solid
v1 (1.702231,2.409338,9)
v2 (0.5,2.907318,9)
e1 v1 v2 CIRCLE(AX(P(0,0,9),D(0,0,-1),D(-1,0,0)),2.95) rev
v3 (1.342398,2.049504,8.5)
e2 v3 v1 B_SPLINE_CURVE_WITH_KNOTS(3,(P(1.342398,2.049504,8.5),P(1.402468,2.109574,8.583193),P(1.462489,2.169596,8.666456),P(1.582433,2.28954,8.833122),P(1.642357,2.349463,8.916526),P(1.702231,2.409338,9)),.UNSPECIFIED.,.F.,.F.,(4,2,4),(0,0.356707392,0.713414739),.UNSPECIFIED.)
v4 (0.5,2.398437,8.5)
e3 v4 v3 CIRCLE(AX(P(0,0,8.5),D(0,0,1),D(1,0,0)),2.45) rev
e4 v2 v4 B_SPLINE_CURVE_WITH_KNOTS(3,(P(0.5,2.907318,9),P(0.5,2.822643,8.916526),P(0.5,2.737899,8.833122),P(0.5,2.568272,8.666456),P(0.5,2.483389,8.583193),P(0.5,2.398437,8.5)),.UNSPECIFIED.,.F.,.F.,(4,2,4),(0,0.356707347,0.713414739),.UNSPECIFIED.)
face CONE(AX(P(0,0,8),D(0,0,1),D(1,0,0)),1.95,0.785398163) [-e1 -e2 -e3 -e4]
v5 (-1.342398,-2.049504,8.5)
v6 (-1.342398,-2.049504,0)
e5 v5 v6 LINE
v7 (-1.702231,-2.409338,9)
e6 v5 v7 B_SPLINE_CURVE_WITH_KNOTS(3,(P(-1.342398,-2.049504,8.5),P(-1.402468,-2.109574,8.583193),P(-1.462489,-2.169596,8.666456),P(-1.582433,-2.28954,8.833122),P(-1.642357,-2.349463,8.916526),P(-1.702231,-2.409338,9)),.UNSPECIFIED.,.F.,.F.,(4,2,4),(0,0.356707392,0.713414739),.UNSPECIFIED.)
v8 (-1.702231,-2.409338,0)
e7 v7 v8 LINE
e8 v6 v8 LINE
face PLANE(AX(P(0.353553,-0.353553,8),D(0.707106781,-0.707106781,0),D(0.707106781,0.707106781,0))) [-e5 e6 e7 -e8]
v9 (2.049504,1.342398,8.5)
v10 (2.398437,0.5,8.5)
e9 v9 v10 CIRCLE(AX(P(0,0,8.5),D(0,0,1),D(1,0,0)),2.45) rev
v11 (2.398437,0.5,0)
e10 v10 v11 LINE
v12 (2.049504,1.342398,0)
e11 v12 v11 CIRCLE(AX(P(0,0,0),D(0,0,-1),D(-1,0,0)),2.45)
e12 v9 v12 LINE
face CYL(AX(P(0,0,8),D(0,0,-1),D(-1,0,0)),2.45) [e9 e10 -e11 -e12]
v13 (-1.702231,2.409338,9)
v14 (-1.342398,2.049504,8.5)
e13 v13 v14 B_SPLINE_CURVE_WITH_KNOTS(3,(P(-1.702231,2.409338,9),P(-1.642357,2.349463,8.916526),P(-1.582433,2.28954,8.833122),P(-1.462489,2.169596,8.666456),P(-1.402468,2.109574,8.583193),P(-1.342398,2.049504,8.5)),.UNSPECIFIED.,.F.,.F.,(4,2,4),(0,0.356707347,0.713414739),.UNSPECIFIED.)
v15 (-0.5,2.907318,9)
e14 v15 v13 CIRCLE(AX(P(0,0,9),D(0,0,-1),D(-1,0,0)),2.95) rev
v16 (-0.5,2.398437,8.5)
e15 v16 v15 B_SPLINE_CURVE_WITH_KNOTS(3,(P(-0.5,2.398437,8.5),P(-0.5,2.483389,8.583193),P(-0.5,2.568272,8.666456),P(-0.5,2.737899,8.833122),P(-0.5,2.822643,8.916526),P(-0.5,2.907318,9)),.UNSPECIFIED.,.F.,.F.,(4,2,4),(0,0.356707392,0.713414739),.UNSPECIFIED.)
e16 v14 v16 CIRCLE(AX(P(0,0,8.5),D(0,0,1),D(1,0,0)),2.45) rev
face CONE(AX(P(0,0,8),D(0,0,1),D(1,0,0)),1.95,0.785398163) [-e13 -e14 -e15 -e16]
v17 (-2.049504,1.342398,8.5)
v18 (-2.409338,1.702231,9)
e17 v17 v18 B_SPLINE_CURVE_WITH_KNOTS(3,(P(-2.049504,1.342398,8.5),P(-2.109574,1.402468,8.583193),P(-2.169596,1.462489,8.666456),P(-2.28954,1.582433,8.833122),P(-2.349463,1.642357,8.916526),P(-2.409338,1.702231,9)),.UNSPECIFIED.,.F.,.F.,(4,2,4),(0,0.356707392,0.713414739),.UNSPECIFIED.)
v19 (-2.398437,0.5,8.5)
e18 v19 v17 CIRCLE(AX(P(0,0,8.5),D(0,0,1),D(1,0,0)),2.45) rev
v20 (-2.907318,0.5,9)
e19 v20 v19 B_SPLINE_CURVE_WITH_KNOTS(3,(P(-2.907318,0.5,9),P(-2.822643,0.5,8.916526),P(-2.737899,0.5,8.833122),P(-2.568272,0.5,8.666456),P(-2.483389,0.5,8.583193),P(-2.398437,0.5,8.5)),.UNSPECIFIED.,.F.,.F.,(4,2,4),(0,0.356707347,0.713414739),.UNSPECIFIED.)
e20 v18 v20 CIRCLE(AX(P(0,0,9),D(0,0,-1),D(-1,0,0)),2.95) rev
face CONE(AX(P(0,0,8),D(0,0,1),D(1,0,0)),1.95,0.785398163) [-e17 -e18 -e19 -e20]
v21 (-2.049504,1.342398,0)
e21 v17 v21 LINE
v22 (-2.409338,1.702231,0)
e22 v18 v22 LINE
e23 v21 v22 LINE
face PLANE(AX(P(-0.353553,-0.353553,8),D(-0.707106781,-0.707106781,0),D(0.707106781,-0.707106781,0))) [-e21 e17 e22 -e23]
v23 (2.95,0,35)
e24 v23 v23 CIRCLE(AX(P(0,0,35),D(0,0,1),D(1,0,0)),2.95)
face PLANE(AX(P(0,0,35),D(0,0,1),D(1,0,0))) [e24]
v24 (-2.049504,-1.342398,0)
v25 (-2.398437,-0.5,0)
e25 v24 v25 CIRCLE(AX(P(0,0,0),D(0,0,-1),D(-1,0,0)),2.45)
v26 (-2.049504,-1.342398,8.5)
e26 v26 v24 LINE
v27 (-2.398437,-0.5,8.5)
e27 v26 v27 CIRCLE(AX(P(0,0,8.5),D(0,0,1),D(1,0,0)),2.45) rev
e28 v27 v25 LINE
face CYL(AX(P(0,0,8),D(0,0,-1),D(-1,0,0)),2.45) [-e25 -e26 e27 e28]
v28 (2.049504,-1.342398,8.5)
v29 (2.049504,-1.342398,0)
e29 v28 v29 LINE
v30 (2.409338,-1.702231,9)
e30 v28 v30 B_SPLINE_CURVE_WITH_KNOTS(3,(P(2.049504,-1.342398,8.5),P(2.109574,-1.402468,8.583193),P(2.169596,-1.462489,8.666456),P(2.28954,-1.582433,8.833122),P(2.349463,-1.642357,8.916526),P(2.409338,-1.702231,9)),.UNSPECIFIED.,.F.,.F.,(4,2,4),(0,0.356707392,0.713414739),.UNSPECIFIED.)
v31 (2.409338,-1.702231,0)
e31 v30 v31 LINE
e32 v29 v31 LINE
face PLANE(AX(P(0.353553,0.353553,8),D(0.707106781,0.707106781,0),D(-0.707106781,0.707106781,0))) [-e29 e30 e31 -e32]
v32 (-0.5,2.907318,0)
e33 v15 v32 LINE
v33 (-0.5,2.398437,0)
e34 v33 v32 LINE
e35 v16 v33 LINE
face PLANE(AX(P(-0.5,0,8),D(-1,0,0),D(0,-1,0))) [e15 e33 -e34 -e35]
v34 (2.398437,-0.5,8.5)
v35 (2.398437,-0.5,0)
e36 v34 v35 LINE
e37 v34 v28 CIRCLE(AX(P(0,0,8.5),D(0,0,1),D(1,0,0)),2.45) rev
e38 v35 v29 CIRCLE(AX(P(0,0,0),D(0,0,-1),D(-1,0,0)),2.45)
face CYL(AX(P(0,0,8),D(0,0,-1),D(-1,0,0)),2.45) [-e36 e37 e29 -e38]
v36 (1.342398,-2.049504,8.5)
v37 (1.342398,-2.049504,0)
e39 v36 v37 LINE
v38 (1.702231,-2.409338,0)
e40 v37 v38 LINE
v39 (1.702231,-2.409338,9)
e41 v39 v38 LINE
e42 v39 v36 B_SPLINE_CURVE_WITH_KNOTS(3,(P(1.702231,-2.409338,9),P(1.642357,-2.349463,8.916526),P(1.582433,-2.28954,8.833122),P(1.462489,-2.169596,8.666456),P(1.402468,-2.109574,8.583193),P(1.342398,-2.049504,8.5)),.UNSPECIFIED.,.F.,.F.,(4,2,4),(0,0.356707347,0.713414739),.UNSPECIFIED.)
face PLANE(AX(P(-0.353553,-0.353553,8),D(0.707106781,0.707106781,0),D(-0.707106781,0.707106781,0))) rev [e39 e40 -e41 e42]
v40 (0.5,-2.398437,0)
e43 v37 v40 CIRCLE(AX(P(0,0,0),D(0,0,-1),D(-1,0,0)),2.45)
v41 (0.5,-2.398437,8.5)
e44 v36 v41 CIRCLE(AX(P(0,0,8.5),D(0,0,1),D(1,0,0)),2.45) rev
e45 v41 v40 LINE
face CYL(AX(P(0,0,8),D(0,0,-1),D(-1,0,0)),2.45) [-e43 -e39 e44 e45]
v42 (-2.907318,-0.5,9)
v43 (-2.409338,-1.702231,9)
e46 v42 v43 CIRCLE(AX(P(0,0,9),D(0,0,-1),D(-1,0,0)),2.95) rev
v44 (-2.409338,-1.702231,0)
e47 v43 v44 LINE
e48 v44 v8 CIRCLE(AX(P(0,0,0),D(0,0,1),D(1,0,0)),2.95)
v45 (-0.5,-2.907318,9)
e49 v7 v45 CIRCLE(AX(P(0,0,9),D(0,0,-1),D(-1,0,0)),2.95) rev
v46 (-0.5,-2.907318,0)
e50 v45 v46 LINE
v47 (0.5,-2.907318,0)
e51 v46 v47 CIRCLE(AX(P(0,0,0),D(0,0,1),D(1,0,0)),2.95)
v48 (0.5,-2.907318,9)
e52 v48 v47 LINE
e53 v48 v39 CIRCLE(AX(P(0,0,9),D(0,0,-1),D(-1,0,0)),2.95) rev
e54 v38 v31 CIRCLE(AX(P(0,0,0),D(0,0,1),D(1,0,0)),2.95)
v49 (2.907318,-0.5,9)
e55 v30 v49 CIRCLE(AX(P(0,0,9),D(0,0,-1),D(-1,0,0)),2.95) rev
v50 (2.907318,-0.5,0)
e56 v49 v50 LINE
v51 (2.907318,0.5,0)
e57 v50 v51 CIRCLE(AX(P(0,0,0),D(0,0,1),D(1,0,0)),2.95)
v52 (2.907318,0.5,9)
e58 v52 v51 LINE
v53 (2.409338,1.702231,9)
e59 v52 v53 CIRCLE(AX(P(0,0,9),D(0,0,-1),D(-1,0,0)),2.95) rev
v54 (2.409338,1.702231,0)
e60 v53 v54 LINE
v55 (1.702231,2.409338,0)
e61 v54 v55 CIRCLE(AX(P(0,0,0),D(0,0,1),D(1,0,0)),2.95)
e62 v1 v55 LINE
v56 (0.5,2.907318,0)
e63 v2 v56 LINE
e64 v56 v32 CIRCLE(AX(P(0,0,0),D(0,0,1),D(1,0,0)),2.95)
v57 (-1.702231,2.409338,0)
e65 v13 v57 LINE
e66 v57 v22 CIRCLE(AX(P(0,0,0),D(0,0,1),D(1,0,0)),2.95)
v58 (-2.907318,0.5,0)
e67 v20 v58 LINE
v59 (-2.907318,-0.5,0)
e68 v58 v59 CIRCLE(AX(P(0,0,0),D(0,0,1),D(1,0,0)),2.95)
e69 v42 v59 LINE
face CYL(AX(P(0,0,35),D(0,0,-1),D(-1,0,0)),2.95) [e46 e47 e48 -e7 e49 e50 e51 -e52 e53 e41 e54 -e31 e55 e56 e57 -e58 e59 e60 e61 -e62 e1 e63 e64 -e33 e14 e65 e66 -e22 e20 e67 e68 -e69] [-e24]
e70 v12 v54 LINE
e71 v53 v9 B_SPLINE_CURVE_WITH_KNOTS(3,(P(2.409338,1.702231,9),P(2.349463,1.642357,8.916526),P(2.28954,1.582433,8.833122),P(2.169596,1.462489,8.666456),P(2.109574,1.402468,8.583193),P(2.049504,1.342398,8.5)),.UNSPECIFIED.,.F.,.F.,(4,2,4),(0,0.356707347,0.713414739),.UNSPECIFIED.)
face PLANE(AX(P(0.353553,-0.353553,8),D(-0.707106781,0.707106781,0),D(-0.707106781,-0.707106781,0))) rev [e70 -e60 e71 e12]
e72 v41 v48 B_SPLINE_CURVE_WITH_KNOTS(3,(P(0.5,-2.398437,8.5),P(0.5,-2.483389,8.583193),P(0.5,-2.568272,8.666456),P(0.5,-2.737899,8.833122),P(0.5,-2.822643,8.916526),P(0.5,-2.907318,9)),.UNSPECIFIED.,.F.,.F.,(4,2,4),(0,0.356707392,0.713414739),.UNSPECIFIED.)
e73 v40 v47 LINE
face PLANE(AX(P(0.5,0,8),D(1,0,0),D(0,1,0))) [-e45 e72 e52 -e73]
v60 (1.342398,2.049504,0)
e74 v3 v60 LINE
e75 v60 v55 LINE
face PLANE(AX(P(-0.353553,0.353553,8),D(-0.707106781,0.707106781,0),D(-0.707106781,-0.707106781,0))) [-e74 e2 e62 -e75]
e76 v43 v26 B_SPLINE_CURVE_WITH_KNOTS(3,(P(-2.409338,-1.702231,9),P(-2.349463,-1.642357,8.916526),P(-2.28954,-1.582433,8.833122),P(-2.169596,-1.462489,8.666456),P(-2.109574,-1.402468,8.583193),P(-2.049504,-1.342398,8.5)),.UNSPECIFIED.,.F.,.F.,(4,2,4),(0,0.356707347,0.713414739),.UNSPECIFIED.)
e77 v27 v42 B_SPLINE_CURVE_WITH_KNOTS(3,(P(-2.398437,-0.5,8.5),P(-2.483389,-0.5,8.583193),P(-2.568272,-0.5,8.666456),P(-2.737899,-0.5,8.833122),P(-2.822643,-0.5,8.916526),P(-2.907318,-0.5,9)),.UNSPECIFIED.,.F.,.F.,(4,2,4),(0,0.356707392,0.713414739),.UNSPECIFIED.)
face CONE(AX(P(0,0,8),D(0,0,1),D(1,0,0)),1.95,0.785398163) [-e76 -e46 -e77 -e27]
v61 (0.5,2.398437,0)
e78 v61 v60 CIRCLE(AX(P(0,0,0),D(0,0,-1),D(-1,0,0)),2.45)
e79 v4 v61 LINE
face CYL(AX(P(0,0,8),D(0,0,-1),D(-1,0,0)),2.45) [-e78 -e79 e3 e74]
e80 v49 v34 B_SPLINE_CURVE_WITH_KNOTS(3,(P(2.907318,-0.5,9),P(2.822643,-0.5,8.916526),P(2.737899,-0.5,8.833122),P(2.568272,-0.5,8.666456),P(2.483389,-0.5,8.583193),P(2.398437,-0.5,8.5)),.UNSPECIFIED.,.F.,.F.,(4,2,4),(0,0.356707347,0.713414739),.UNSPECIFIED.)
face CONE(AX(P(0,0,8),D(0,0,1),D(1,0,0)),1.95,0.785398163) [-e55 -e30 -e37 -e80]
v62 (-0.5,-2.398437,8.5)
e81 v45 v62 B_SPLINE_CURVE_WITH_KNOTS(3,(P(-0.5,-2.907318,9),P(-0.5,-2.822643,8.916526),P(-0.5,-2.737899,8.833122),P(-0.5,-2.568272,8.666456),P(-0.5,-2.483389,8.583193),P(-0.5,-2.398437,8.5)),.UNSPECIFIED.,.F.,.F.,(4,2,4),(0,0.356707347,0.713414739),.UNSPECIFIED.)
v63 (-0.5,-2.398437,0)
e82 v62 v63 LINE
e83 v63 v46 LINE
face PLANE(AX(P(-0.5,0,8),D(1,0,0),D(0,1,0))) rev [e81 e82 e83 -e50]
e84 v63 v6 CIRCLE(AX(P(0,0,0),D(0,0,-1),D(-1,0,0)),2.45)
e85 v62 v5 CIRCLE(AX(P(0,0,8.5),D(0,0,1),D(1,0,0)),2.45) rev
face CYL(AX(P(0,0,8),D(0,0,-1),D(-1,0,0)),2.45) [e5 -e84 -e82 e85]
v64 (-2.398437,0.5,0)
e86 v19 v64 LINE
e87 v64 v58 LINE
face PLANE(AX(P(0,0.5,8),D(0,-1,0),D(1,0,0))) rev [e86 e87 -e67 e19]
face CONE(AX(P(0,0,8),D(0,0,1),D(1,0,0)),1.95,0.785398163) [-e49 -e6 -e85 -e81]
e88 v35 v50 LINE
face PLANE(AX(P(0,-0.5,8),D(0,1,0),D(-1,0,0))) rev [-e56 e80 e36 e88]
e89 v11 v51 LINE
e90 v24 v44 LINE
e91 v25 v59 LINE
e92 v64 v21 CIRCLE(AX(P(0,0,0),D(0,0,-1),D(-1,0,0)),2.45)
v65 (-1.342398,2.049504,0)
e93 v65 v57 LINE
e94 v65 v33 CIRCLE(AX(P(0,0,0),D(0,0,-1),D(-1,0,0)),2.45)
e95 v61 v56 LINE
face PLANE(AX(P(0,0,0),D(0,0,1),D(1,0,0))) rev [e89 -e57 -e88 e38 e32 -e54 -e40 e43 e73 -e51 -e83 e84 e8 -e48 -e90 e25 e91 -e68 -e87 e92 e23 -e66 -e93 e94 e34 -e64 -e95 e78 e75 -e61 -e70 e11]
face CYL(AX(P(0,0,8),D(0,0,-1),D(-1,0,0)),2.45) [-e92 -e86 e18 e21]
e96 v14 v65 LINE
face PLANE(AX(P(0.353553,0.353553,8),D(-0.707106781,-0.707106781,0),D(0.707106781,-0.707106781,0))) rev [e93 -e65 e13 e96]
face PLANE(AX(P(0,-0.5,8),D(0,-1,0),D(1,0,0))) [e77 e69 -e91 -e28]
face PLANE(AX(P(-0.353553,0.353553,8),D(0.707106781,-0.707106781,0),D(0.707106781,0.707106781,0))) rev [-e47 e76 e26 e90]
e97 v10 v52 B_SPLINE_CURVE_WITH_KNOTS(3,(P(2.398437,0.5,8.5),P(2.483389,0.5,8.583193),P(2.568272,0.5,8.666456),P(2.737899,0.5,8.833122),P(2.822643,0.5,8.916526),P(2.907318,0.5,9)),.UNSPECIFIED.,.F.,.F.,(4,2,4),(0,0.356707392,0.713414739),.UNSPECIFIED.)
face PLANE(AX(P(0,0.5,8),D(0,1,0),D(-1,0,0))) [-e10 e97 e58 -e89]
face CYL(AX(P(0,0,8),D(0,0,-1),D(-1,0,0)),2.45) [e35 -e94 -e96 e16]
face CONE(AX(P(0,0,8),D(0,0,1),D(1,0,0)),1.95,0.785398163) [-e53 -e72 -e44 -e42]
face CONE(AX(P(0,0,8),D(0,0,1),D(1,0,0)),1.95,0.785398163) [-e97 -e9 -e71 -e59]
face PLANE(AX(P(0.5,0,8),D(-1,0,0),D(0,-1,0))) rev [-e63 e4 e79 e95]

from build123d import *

# Parameters (mm, degrees)
SKETCH1_R           = 2.95
BOSS_EXTRUDE1_DEPTH = 35
CUT_EXTRUDE1_DEPTH  = 8
CHAMFER1_SIZE       = 1


with BuildPart() as part:
    # Sketch1 → Boss-Extrude1 (new body)
    with BuildSketch(Plane.XY):
        Circle(SKETCH1_R)
    extrude(amount=BOSS_EXTRUDE1_DEPTH)

    # Sketch2 → Cut-Extrude1 (cut)
    with BuildSketch(Plane(origin=(0, 0, 0), x_dir=(-1, 0, 0), z_dir=(0, 0, -1))):
        with BuildLine():
            ThreePointArc((-2.398436991, 0.5), (-2.263504855, 0.937574409), (-2.049504451, 1.34239767))
            Line((-2.049504451, 1.34239767), (-2.409337912, 1.702231131))
            ThreePointArc((-2.409337912, 1.702231131), (-2.725444621, 1.128916125), (-2.907318352, 0.5))
            Line((-2.907318352, 0.5), (-2.398436991, 0.5))
        make_face()
        with BuildLine():
            ThreePointArc((-1.34239767, 2.049504451), (-0.937574409, 2.263504855), (-0.5, 2.398436991))
            Line((-0.5, 2.398436991), (-0.5, 2.907318352))
            ThreePointArc((-0.5, 2.907318352), (-1.128916125, 2.725444621), (-1.702231131, 2.409337912))
            Line((-1.702231131, 2.409337912), (-1.34239767, 2.049504451))
        make_face()
        with BuildLine():
            Line((0.5, 2.907318352), (0.5, 2.398436991))
            ThreePointArc((0.5, 2.398436991), (0.937574409, 2.263504855), (1.34239767, 2.049504451))
            Line((1.34239767, 2.049504451), (1.702231131, 2.409337912))
            ThreePointArc((1.702231131, 2.409337912), (1.128916125, 2.725444621), (0.5, 2.907318352))
        make_face()
        with BuildLine():
            Line((2.409337912, 1.702231131), (2.049504451, 1.34239767))
            ThreePointArc((2.049504451, 1.34239767), (2.263504855, 0.937574409), (2.398436991, 0.5))
            Line((2.398436991, 0.5), (2.907318352, 0.5))
            ThreePointArc((2.907318352, 0.5), (2.725444621, 1.128916125), (2.409337912, 1.702231131))
        make_face()
        with BuildLine():
            Line((2.907318352, -0.5), (2.398436991, -0.5))
            ThreePointArc((2.398436991, -0.5), (2.263504855, -0.937574409), (2.049504451, -1.34239767))
            Line((2.049504451, -1.34239767), (2.409337912, -1.702231131))
            ThreePointArc((2.409337912, -1.702231131), (2.725444621, -1.128916125), (2.907318352, -0.5))
        make_face()
        with BuildLine():
            Line((1.702231131, -2.409337912), (1.34239767, -2.049504451))
            ThreePointArc((1.34239767, -2.049504451), (0.937574409, -2.263504855), (0.5, -2.398436991))
            Line((0.5, -2.398436991), (0.5, -2.907318352))
            ThreePointArc((0.5, -2.907318352), (1.128916125, -2.725444621), (1.702231131, -2.409337912))
        make_face()
        with BuildLine():
            ThreePointArc((-0.5, -2.398436991), (-0.937574409, -2.263504855), (-1.34239767, -2.049504451))
            Line((-1.34239767, -2.049504451), (-1.702231131, -2.409337912))
            ThreePointArc((-1.702231131, -2.409337912), (-1.128916125, -2.725444621), (-0.5, -2.907318352))
            Line((-0.5, -2.907318352), (-0.5, -2.398436991))
        make_face()
        with BuildLine():
            ThreePointArc((-2.049504451, -1.34239767), (-2.263504855, -0.937574409), (-2.398436991, -0.5))
            Line((-2.398436991, -0.5), (-2.907318352, -0.5))
            ThreePointArc((-2.907318352, -0.5), (-2.725444621, -1.128916125), (-2.409337912, -1.702231131))
            Line((-2.409337912, -1.702231131), (-2.049504451, -1.34239767))
        make_face()
    extrude(amount=-CUT_EXTRUDE1_DEPTH, mode=Mode.SUBTRACT)

    # Chamfer1
    # the kernel refuses this chamfer: 1 mm, written as the material it takes off along each edge
    with BuildSketch(Plane(origin=(0, 0, 8), x_dir=(0.6453423073627431, -0.7638935176631171, 0), z_dir=(0.7638935176631171, 0.6453423073627431, 0))) as chamfer1_piece_1_section:
        Polygon((2.95, -CHAMFER1_SIZE), (2.95 - CHAMFER1_SIZE, 0), (2.95, 0), align=None)
    chamfer1_piece_1 = revolve(axis=Axis((0, 0, 8), (0, 0, -1)), revolution_arc=125.382690704, mode=Mode.PRIVATE)
    chamfer1_piece_1 = split(chamfer1_piece_1, bisect_by=Plane(origin=(0.5, 0, 8), z_dir=(1, 0, 0)), keep=Keep.TOP, mode=Mode.PRIVATE)
    chamfer1_piece_1 = split(chamfer1_piece_1, bisect_by=Plane(origin=(-0.353553391, -0.353553391, 8), z_dir=(-0.7071067811865415, -0.7071067811865537, 0)), keep=Keep.TOP, mode=Mode.PRIVATE)
    chamfer1_piece_1 = chamfer1_piece_1 - Plane(origin=(0, 0, 8), x_dir=(0.20408163265306725, -0.9789538738948115, 0), z_dir=(0, 0, -1)) * Cylinder(2.45, 12, mode=Mode.PRIVATE)
    add(chamfer1_piece_1, mode=Mode.SUBTRACT)
    with BuildSketch(Plane(origin=(0, 0, 8), x_dir=(0.6453423073627431, -0.7638935176631171, 0), z_dir=(0.7638935176631171, 0.6453423073627431, 0))) as chamfer1_piece_2_section:
        Polygon((2.95, -CHAMFER1_SIZE), (2.95 - CHAMFER1_SIZE, 0), (2.95, 0), align=None)
    chamfer1_piece_2 = revolve(axis=Axis((0, 0, 8), (0, 0, -1)), revolution_arc=125.382690704, mode=Mode.PRIVATE)
    chamfer1_piece_2 = split(chamfer1_piece_2, bisect_by=Plane(origin=(0.353553391, -0.353553391, 8), z_dir=(0.7071067811865517, -0.7071067811865434, 0)), keep=Keep.TOP, mode=Mode.PRIVATE)
    chamfer1_piece_2 = split(chamfer1_piece_2, bisect_by=Plane(origin=(-0.5, 0, 8), z_dir=(-1, 0, 0)), keep=Keep.TOP, mode=Mode.PRIVATE)
    chamfer1_piece_2 = chamfer1_piece_2 - Plane(origin=(0, 0, 8), x_dir=(0.20408163265306725, -0.9789538738948115, 0), z_dir=(0, 0, -1)) * Cylinder(2.45, 12, mode=Mode.PRIVATE)
    add(chamfer1_piece_2, mode=Mode.SUBTRACT)
    with BuildSketch(Plane(origin=(0, 0, 8), x_dir=(0.6453423073627431, -0.7638935176631171, 0), z_dir=(0.7638935176631171, 0.6453423073627431, 0))) as chamfer1_piece_3_section:
        Polygon((2.95, -CHAMFER1_SIZE), (2.95 - CHAMFER1_SIZE, 0), (2.95, 0), align=None)
    chamfer1_piece_3 = revolve(axis=Axis((0, 0, 8), (0, 0, -1)), revolution_arc=125.382690704, mode=Mode.PRIVATE)
    chamfer1_piece_3 = split(chamfer1_piece_3, bisect_by=Plane(origin=(0, -0.5, 8), z_dir=(0, -1, 0)), keep=Keep.TOP, mode=Mode.PRIVATE)
    chamfer1_piece_3 = split(chamfer1_piece_3, bisect_by=Plane(origin=(-0.353553391, 0.353553391, 8), z_dir=(-0.7071067811865515, 0.7071067811865437, 0)), keep=Keep.TOP, mode=Mode.PRIVATE)
    chamfer1_piece_3 = chamfer1_piece_3 - Plane(origin=(0, 0, 8), x_dir=(0.20408163265306725, -0.9789538738948115, 0), z_dir=(0, 0, -1)) * Cylinder(2.45, 12, mode=Mode.PRIVATE)
    add(chamfer1_piece_3, mode=Mode.SUBTRACT)
    with BuildSketch(Plane(origin=(0, 0, 8), x_dir=(-0.083828364721268, -0.9964802081668046, 0), z_dir=(0.9964802081668046, -0.083828364721268, 0))) as chamfer1_piece_4_section:
        Polygon((2.95, -CHAMFER1_SIZE), (2.95 - CHAMFER1_SIZE, 0), (2.95, 0), align=None)
    chamfer1_piece_4 = revolve(axis=Axis((0, 0, 8), (0, 0, -1)), revolution_arc=125.382690704, mode=Mode.PRIVATE)
    chamfer1_piece_4 = split(chamfer1_piece_4, bisect_by=Plane(origin=(0.353553391, -0.353553391, 8), z_dir=(0.7071067811865517, -0.7071067811865434, 0)), keep=Keep.TOP, mode=Mode.PRIVATE)
    chamfer1_piece_4 = split(chamfer1_piece_4, bisect_by=Plane(origin=(-0.5, 0, 8), z_dir=(-1, 0, 0)), keep=Keep.TOP, mode=Mode.PRIVATE)
    chamfer1_piece_4 = chamfer1_piece_4 - Plane(origin=(0, 0, 8), x_dir=(-0.5479174163352548, -0.8365324290644679, 0), z_dir=(0, 0, -1)) * Cylinder(2.45, 12, mode=Mode.PRIVATE)
    add(chamfer1_piece_4, mode=Mode.SUBTRACT)
    with BuildSketch(Plane(origin=(0, 0, 8), x_dir=(-0.083828364721268, -0.9964802081668046, 0), z_dir=(0.9964802081668046, -0.083828364721268, 0))) as chamfer1_piece_5_section:
        Polygon((2.95, -CHAMFER1_SIZE), (2.95 - CHAMFER1_SIZE, 0), (2.95, 0), align=None)
    chamfer1_piece_5 = revolve(axis=Axis((0, 0, 8), (0, 0, -1)), revolution_arc=125.382690704, mode=Mode.PRIVATE)
    chamfer1_piece_5 = split(chamfer1_piece_5, bisect_by=Plane(origin=(0, -0.5, 8), z_dir=(0, -1, 0)), keep=Keep.TOP, mode=Mode.PRIVATE)
    chamfer1_piece_5 = split(chamfer1_piece_5, bisect_by=Plane(origin=(-0.353553391, 0.353553391, 8), z_dir=(-0.7071067811865515, 0.7071067811865437, 0)), keep=Keep.TOP, mode=Mode.PRIVATE)
    chamfer1_piece_5 = chamfer1_piece_5 - Plane(origin=(0, 0, 8), x_dir=(-0.5479174163352548, -0.8365324290644679, 0), z_dir=(0, 0, -1)) * Cylinder(2.45, 12, mode=Mode.PRIVATE)
    add(chamfer1_piece_5, mode=Mode.SUBTRACT)
    with BuildSketch(Plane(origin=(0, 0, 8), x_dir=(-0.083828364721268, -0.9964802081668046, 0), z_dir=(0.9964802081668046, -0.083828364721268, 0))) as chamfer1_piece_6_section:
        Polygon((2.95, -CHAMFER1_SIZE), (2.95 - CHAMFER1_SIZE, 0), (2.95, 0), align=None)
    chamfer1_piece_6 = revolve(axis=Axis((0, 0, 8), (0, 0, -1)), revolution_arc=125.382690704, mode=Mode.PRIVATE)
    chamfer1_piece_6 = split(chamfer1_piece_6, bisect_by=Plane(origin=(-0.353553391, -0.353553391, 8), z_dir=(-0.7071067811865454, -0.7071067811865497, 0)), keep=Keep.TOP, mode=Mode.PRIVATE)
    chamfer1_piece_6 = split(chamfer1_piece_6, bisect_by=Plane(origin=(0, 0.5, 8), z_dir=(0, 1, 0)), keep=Keep.TOP, mode=Mode.PRIVATE)
    chamfer1_piece_6 = chamfer1_piece_6 - Plane(origin=(0, 0, 8), x_dir=(-0.5479174163352548, -0.8365324290644679, 0), z_dir=(0, 0, -1)) * Cylinder(2.45, 12, mode=Mode.PRIVATE)
    add(chamfer1_piece_6, mode=Mode.SUBTRACT)
    with BuildSketch(Plane(origin=(0, 0, 8), x_dir=(-0.7638935176631205, -0.645342307362739, 0), z_dir=(0.645342307362739, -0.7638935176631205, 0))) as chamfer1_piece_7_section:
        Polygon((2.95, -CHAMFER1_SIZE), (2.95 - CHAMFER1_SIZE, 0), (2.95, 0), align=None)
    chamfer1_piece_7 = revolve(axis=Axis((0, 0, 8), (0, 0, -1)), revolution_arc=125.382690704, mode=Mode.PRIVATE)
    chamfer1_piece_7 = split(chamfer1_piece_7, bisect_by=Plane(origin=(0, -0.5, 8), z_dir=(0, -1, 0)), keep=Keep.TOP, mode=Mode.PRIVATE)
    chamfer1_piece_7 = split(chamfer1_piece_7, bisect_by=Plane(origin=(-0.353553391, 0.353553391, 8), z_dir=(-0.7071067811865515, 0.7071067811865437, 0)), keep=Keep.TOP, mode=Mode.PRIVATE)
    chamfer1_piece_7 = chamfer1_piece_7 - Plane(origin=(0, 0, 8), x_dir=(-0.9789538738948118, -0.20408163265306617, 0), z_dir=(0, 0, -1)) * Cylinder(2.45, 12, mode=Mode.PRIVATE)
    add(chamfer1_piece_7, mode=Mode.SUBTRACT)
    with BuildSketch(Plane(origin=(0, 0, 8), x_dir=(-0.7638935176631205, -0.645342307362739, 0), z_dir=(0.645342307362739, -0.7638935176631205, 0))) as chamfer1_piece_8_section:
        Polygon((2.95, -CHAMFER1_SIZE), (2.95 - CHAMFER1_SIZE, 0), (2.95, 0), align=None)
    chamfer1_piece_8 = revolve(axis=Axis((0, 0, 8), (0, 0, -1)), revolution_arc=125.382690704, mode=Mode.PRIVATE)
    chamfer1_piece_8 = split(chamfer1_piece_8, bisect_by=Plane(origin=(-0.353553391, -0.353553391, 8), z_dir=(-0.7071067811865454, -0.7071067811865497, 0)), keep=Keep.TOP, mode=Mode.PRIVATE)
    chamfer1_piece_8 = split(chamfer1_piece_8, bisect_by=Plane(origin=(0, 0.5, 8), z_dir=(0, 1, 0)), keep=Keep.TOP, mode=Mode.PRIVATE)
    chamfer1_piece_8 = chamfer1_piece_8 - Plane(origin=(0, 0, 8), x_dir=(-0.9789538738948118, -0.20408163265306617, 0), z_dir=(0, 0, -1)) * Cylinder(2.45, 12, mode=Mode.PRIVATE)
    add(chamfer1_piece_8, mode=Mode.SUBTRACT)
    with BuildSketch(Plane(origin=(0, 0, 8), x_dir=(-0.7638935176631205, -0.645342307362739, 0), z_dir=(0.645342307362739, -0.7638935176631205, 0))) as chamfer1_piece_9_section:
        Polygon((2.95, -CHAMFER1_SIZE), (2.95 - CHAMFER1_SIZE, 0), (2.95, 0), align=None)
    chamfer1_piece_9 = revolve(axis=Axis((0, 0, 8), (0, 0, -1)), revolution_arc=125.382690704, mode=Mode.PRIVATE)
    chamfer1_piece_9 = split(chamfer1_piece_9, bisect_by=Plane(origin=(-0.5, 0, 8), z_dir=(-1, 0, 0)), keep=Keep.TOP, mode=Mode.PRIVATE)
    chamfer1_piece_9 = split(chamfer1_piece_9, bisect_by=Plane(origin=(0.353553391, 0.353553391, 8), z_dir=(0.7071067811865474, 0.7071067811865477, 0)), keep=Keep.TOP, mode=Mode.PRIVATE)
    chamfer1_piece_9 = chamfer1_piece_9 - Plane(origin=(0, 0, 8), x_dir=(-0.9789538738948118, -0.20408163265306617, 0), z_dir=(0, 0, -1)) * Cylinder(2.45, 12, mode=Mode.PRIVATE)
    add(chamfer1_piece_9, mode=Mode.SUBTRACT)
    with BuildSketch(Plane(origin=(0, 0, 8), x_dir=(-0.9964802081668033, 0.08382836472128195, 0), z_dir=(-0.08382836472128195, -0.9964802081668033, 0))) as chamfer1_piece_10_section:
        Polygon((2.95, -CHAMFER1_SIZE), (2.95 - CHAMFER1_SIZE, 0), (2.95, 0), align=None)
    chamfer1_piece_10 = revolve(axis=Axis((0, 0, 8), (0, 0, -1)), revolution_arc=125.382690704, mode=Mode.PRIVATE)
    chamfer1_piece_10 = split(chamfer1_piece_10, bisect_by=Plane(origin=(-0.353553391, -0.353553391, 8), z_dir=(-0.7071067811865454, -0.7071067811865497, 0)), keep=Keep.TOP, mode=Mode.PRIVATE)
    chamfer1_piece_10 = split(chamfer1_piece_10, bisect_by=Plane(origin=(0, 0.5, 8), z_dir=(0, 1, 0)), keep=Keep.TOP, mode=Mode.PRIVATE)
    chamfer1_piece_10 = chamfer1_piece_10 - Plane(origin=(0, 0, 8), x_dir=(-0.836532429064466, 0.5479174163352577, 0), z_dir=(0, 0, -1)) * Cylinder(2.45, 12, mode=Mode.PRIVATE)
    add(chamfer1_piece_10, mode=Mode.SUBTRACT)
    with BuildSketch(Plane(origin=(0, 0, 8), x_dir=(-0.9964802081668033, 0.08382836472128195, 0), z_dir=(-0.08382836472128195, -0.9964802081668033, 0))) as chamfer1_piece_11_section:
        Polygon((2.95, -CHAMFER1_SIZE), (2.95 - CHAMFER1_SIZE, 0), (2.95, 0), align=None)
    chamfer1_piece_11 = revolve(axis=Axis((0, 0, 8), (0, 0, -1)), revolution_arc=125.382690704, mode=Mode.PRIVATE)
    chamfer1_piece_11 = split(chamfer1_piece_11, bisect_by=Plane(origin=(-0.5, 0, 8), z_dir=(-1, 0, 0)), keep=Keep.TOP, mode=Mode.PRIVATE)
    chamfer1_piece_11 = split(chamfer1_piece_11, bisect_by=Plane(origin=(0.353553391, 0.353553391, 8), z_dir=(0.7071067811865474, 0.7071067811865477, 0)), keep=Keep.TOP, mode=Mode.PRIVATE)
    chamfer1_piece_11 = chamfer1_piece_11 - Plane(origin=(0, 0, 8), x_dir=(-0.836532429064466, 0.5479174163352577, 0), z_dir=(0, 0, -1)) * Cylinder(2.45, 12, mode=Mode.PRIVATE)
    add(chamfer1_piece_11, mode=Mode.SUBTRACT)
    with BuildSketch(Plane(origin=(0, 0, 8), x_dir=(-0.9964802081668033, 0.08382836472128195, 0), z_dir=(-0.08382836472128195, -0.9964802081668033, 0))) as chamfer1_piece_12_section:
        Polygon((2.95, -CHAMFER1_SIZE), (2.95 - CHAMFER1_SIZE, 0), (2.95, 0), align=None)
    chamfer1_piece_12 = revolve(axis=Axis((0, 0, 8), (0, 0, -1)), revolution_arc=125.382690704, mode=Mode.PRIVATE)
    chamfer1_piece_12 = split(chamfer1_piece_12, bisect_by=Plane(origin=(-0.353553391, 0.353553391, 8), z_dir=(-0.7071067811865565, 0.7071067811865386, 0)), keep=Keep.TOP, mode=Mode.PRIVATE)
    chamfer1_piece_12 = split(chamfer1_piece_12, bisect_by=Plane(origin=(0.5, 0, 8), z_dir=(1, 0, 0)), keep=Keep.TOP, mode=Mode.PRIVATE)
    chamfer1_piece_12 = chamfer1_piece_12 - Plane(origin=(0, 0, 8), x_dir=(-0.836532429064466, 0.5479174163352577, 0), z_dir=(0, 0, -1)) * Cylinder(2.45, 12, mode=Mode.PRIVATE)
    add(chamfer1_piece_12, mode=Mode.SUBTRACT)
    with BuildSketch(Plane(origin=(0, 0, 8), x_dir=(0.9964802081668043, -0.08382836472127134, 0), z_dir=(0.08382836472127134, 0.9964802081668043, 0))) as chamfer1_piece_13_section:
        Polygon((2.95, -CHAMFER1_SIZE), (2.95 - CHAMFER1_SIZE, 0), (2.95, 0), align=None)
    chamfer1_piece_13 = revolve(axis=Axis((0, 0, 8), (0, 0, -1)), revolution_arc=125.382690704, mode=Mode.PRIVATE)
    chamfer1_piece_13 = split(chamfer1_piece_13, bisect_by=Plane(origin=(0.353553391, 0.353553391, 8), z_dir=(0.707106781186541, 0.7071067811865541, 0)), keep=Keep.TOP, mode=Mode.PRIVATE)
    chamfer1_piece_13 = split(chamfer1_piece_13, bisect_by=Plane(origin=(0, -0.5, 8), z_dir=(0, -1, 0)), keep=Keep.TOP, mode=Mode.PRIVATE)
    chamfer1_piece_13 = chamfer1_piece_13 - Plane(origin=(0, 0, 8), x_dir=(0.8365324290644678, -0.5479174163352549, 0), z_dir=(0, 0, -1)) * Cylinder(2.45, 12, mode=Mode.PRIVATE)
    add(chamfer1_piece_13, mode=Mode.SUBTRACT)
    with BuildSketch(Plane(origin=(0, 0, 8), x_dir=(0.9964802081668043, -0.08382836472127134, 0), z_dir=(0.08382836472127134, 0.9964802081668043, 0))) as chamfer1_piece_14_section:
        Polygon((2.95, -CHAMFER1_SIZE), (2.95 - CHAMFER1_SIZE, 0), (2.95, 0), align=None)
    chamfer1_piece_14 = revolve(axis=Axis((0, 0, 8), (0, 0, -1)), revolution_arc=125.382690704, mode=Mode.PRIVATE)
    chamfer1_piece_14 = split(chamfer1_piece_14, bisect_by=Plane(origin=(0.5, 0, 8), z_dir=(1, 0, 0)), keep=Keep.TOP, mode=Mode.PRIVATE)
    chamfer1_piece_14 = split(chamfer1_piece_14, bisect_by=Plane(origin=(-0.353553391, -0.353553391, 8), z_dir=(-0.7071067811865415, -0.7071067811865537, 0)), keep=Keep.TOP, mode=Mode.PRIVATE)
    chamfer1_piece_14 = chamfer1_piece_14 - Plane(origin=(0, 0, 8), x_dir=(0.8365324290644678, -0.5479174163352549, 0), z_dir=(0, 0, -1)) * Cylinder(2.45, 12, mode=Mode.PRIVATE)
    add(chamfer1_piece_14, mode=Mode.SUBTRACT)
    with BuildSketch(Plane(origin=(0, 0, 8), x_dir=(0.9964802081668043, -0.08382836472127134, 0), z_dir=(0.08382836472127134, 0.9964802081668043, 0))) as chamfer1_piece_15_section:
        Polygon((2.95, -CHAMFER1_SIZE), (2.95 - CHAMFER1_SIZE, 0), (2.95, 0), align=None)
    chamfer1_piece_15 = revolve(axis=Axis((0, 0, 8), (0, 0, -1)), revolution_arc=125.382690704, mode=Mode.PRIVATE)
    chamfer1_piece_15 = split(chamfer1_piece_15, bisect_by=Plane(origin=(0.353553391, -0.353553391, 8), z_dir=(0.7071067811865517, -0.7071067811865434, 0)), keep=Keep.TOP, mode=Mode.PRIVATE)
    chamfer1_piece_15 = split(chamfer1_piece_15, bisect_by=Plane(origin=(-0.5, 0, 8), z_dir=(-1, 0, 0)), keep=Keep.TOP, mode=Mode.PRIVATE)
    chamfer1_piece_15 = chamfer1_piece_15 - Plane(origin=(0, 0, 8), x_dir=(0.8365324290644678, -0.5479174163352549, 0), z_dir=(0, 0, -1)) * Cylinder(2.45, 12, mode=Mode.PRIVATE)
    add(chamfer1_piece_15, mode=Mode.SUBTRACT)
    with BuildSketch(Plane(origin=(0, 0, 8), x_dir=(0.7638935176631216, 0.6453423073627377, 0), z_dir=(-0.6453423073627377, 0.7638935176631216, 0))) as chamfer1_piece_16_section:
        Polygon((2.95, -CHAMFER1_SIZE), (2.95 - CHAMFER1_SIZE, 0), (2.95, 0), align=None)
    chamfer1_piece_16 = revolve(axis=Axis((0, 0, 8), (0, 0, -1)), revolution_arc=125.382690704, mode=Mode.PRIVATE)
    chamfer1_piece_16 = split(chamfer1_piece_16, bisect_by=Plane(origin=(0, 0.5, 8), z_dir=(0, 1, 0)), keep=Keep.TOP, mode=Mode.PRIVATE)
    chamfer1_piece_16 = split(chamfer1_piece_16, bisect_by=Plane(origin=(0.353553391, -0.353553391, 8), z_dir=(0.707106781186556, -0.707106781186539, 0)), keep=Keep.TOP, mode=Mode.PRIVATE)
    chamfer1_piece_16 = chamfer1_piece_16 - Plane(origin=(0, 0, 8), x_dir=(0.8365324290644678, -0.5479174163352549, 0), z_dir=(0, 0, -1)) * Cylinder(2.45, 12, mode=Mode.PRIVATE)
    add(chamfer1_piece_16, mode=Mode.SUBTRACT)
    with BuildSketch(Plane(origin=(0, 0, 8), x_dir=(0.7638935176631216, 0.6453423073627377, 0), z_dir=(-0.6453423073627377, 0.7638935176631216, 0))) as chamfer1_piece_17_section:
        Polygon((2.95, -CHAMFER1_SIZE), (2.95 - CHAMFER1_SIZE, 0), (2.95, 0), align=None)
    chamfer1_piece_17 = revolve(axis=Axis((0, 0, 8), (0, 0, -1)), revolution_arc=125.382690704, mode=Mode.PRIVATE)
    chamfer1_piece_17 = split(chamfer1_piece_17, bisect_by=Plane(origin=(0.353553391, 0.353553391, 8), z_dir=(0.707106781186541, 0.7071067811865541, 0)), keep=Keep.TOP, mode=Mode.PRIVATE)
    chamfer1_piece_17 = split(chamfer1_piece_17, bisect_by=Plane(origin=(0, -0.5, 8), z_dir=(0, -1, 0)), keep=Keep.TOP, mode=Mode.PRIVATE)
    chamfer1_piece_17 = chamfer1_piece_17 - Plane(origin=(0, 0, 8), x_dir=(0.8365324290644678, -0.5479174163352549, 0), z_dir=(0, 0, -1)) * Cylinder(2.45, 12, mode=Mode.PRIVATE)
    add(chamfer1_piece_17, mode=Mode.SUBTRACT)
    with BuildSketch(Plane(origin=(0, 0, 8), x_dir=(0.7638935176631216, 0.6453423073627377, 0), z_dir=(-0.6453423073627377, 0.7638935176631216, 0))) as chamfer1_piece_18_section:
        Polygon((2.95, -CHAMFER1_SIZE), (2.95 - CHAMFER1_SIZE, 0), (2.95, 0), align=None)
    chamfer1_piece_18 = revolve(axis=Axis((0, 0, 8), (0, 0, -1)), revolution_arc=125.382690704, mode=Mode.PRIVATE)
    chamfer1_piece_18 = split(chamfer1_piece_18, bisect_by=Plane(origin=(0.5, 0, 8), z_dir=(1, 0, 0)), keep=Keep.TOP, mode=Mode.PRIVATE)
    chamfer1_piece_18 = split(chamfer1_piece_18, bisect_by=Plane(origin=(-0.353553391, -0.353553391, 8), z_dir=(-0.7071067811865415, -0.7071067811865537, 0)), keep=Keep.TOP, mode=Mode.PRIVATE)
    chamfer1_piece_18 = chamfer1_piece_18 - Plane(origin=(0, 0, 8), x_dir=(0.8365324290644678, -0.5479174163352549, 0), z_dir=(0, 0, -1)) * Cylinder(2.45, 12, mode=Mode.PRIVATE)
    add(chamfer1_piece_18, mode=Mode.SUBTRACT)
    with BuildSketch(Plane(origin=(0, 0, 8), x_dir=(0.08382836472126272, 0.996480208166805, 0), z_dir=(-0.996480208166805, 0.08382836472126272, 0))) as chamfer1_piece_19_section:
        Polygon((2.95, -CHAMFER1_SIZE), (2.95 - CHAMFER1_SIZE, 0), (2.95, 0), align=None)
    chamfer1_piece_19 = revolve(axis=Axis((0, 0, 8), (0, 0, -1)), revolution_arc=125.382690704, mode=Mode.PRIVATE)
    chamfer1_piece_19 = split(chamfer1_piece_19, bisect_by=Plane(origin=(-0.353553391, 0.353553391, 8), z_dir=(-0.7071067811865565, 0.7071067811865386, 0)), keep=Keep.TOP, mode=Mode.PRIVATE)
    chamfer1_piece_19 = split(chamfer1_piece_19, bisect_by=Plane(origin=(0.5, 0, 8), z_dir=(1, 0, 0)), keep=Keep.TOP, mode=Mode.PRIVATE)
    chamfer1_piece_19 = chamfer1_piece_19 - Plane(origin=(0, 0, 8), x_dir=(0.8365324290644678, -0.5479174163352549, 0), z_dir=(0, 0, -1)) * Cylinder(2.45, 12, mode=Mode.PRIVATE)
    add(chamfer1_piece_19, mode=Mode.SUBTRACT)
    with BuildSketch(Plane(origin=(0, 0, 8), x_dir=(0.08382836472126272, 0.996480208166805, 0), z_dir=(-0.996480208166805, 0.08382836472126272, 0))) as chamfer1_piece_20_section:
        Polygon((2.95, -CHAMFER1_SIZE), (2.95 - CHAMFER1_SIZE, 0), (2.95, 0), align=None)
    chamfer1_piece_20 = revolve(axis=Axis((0, 0, 8), (0, 0, -1)), revolution_arc=125.382690704, mode=Mode.PRIVATE)
    chamfer1_piece_20 = split(chamfer1_piece_20, bisect_by=Plane(origin=(0, 0.5, 8), z_dir=(0, 1, 0)), keep=Keep.TOP, mode=Mode.PRIVATE)
    chamfer1_piece_20 = split(chamfer1_piece_20, bisect_by=Plane(origin=(0.353553391, -0.353553391, 8), z_dir=(0.707106781186556, -0.707106781186539, 0)), keep=Keep.TOP, mode=Mode.PRIVATE)
    chamfer1_piece_20 = chamfer1_piece_20 - Plane(origin=(0, 0, 8), x_dir=(0.8365324290644678, -0.5479174163352549, 0), z_dir=(0, 0, -1)) * Cylinder(2.45, 12, mode=Mode.PRIVATE)
    add(chamfer1_piece_20, mode=Mode.SUBTRACT)
    with BuildSketch(Plane(origin=(0, 0, 8), x_dir=(0.08382836472126272, 0.996480208166805, 0), z_dir=(-0.996480208166805, 0.08382836472126272, 0))) as chamfer1_piece_21_section:
        Polygon((2.95, -CHAMFER1_SIZE), (2.95 - CHAMFER1_SIZE, 0), (2.95, 0), align=None)
    chamfer1_piece_21 = revolve(axis=Axis((0, 0, 8), (0, 0, -1)), revolution_arc=125.382690704, mode=Mode.PRIVATE)
    chamfer1_piece_21 = split(chamfer1_piece_21, bisect_by=Plane(origin=(0.353553391, 0.353553391, 8), z_dir=(0.707106781186541, 0.7071067811865541, 0)), keep=Keep.TOP, mode=Mode.PRIVATE)
    chamfer1_piece_21 = split(chamfer1_piece_21, bisect_by=Plane(origin=(0, -0.5, 8), z_dir=(0, -1, 0)), keep=Keep.TOP, mode=Mode.PRIVATE)
    chamfer1_piece_21 = chamfer1_piece_21 - Plane(origin=(0, 0, 8), x_dir=(0.8365324290644678, -0.5479174163352549, 0), z_dir=(0, 0, -1)) * Cylinder(2.45, 12, mode=Mode.PRIVATE)
    add(chamfer1_piece_21, mode=Mode.SUBTRACT)
    with BuildSketch(Plane(origin=(0, 0, 8), x_dir=(-0.6453423073627307, 0.7638935176631274, 0), z_dir=(-0.7638935176631274, -0.6453423073627307, 0))) as chamfer1_piece_22_section:
        Polygon((2.95, -CHAMFER1_SIZE), (2.95 - CHAMFER1_SIZE, 0), (2.95, 0), align=None)
    chamfer1_piece_22 = revolve(axis=Axis((0, 0, 8), (0, 0, -1)), revolution_arc=125.382690704, mode=Mode.PRIVATE)
    chamfer1_piece_22 = split(chamfer1_piece_22, bisect_by=Plane(origin=(-0.5, 0, 8), z_dir=(-1, 0, 0)), keep=Keep.TOP, mode=Mode.PRIVATE)
    chamfer1_piece_22 = split(chamfer1_piece_22, bisect_by=Plane(origin=(0.353553391, 0.353553391, 8), z_dir=(0.7071067811865474, 0.7071067811865477, 0)), keep=Keep.TOP, mode=Mode.PRIVATE)
    chamfer1_piece_22 = chamfer1_piece_22 - Plane(origin=(0, 0, 8), x_dir=(-0.2040816326530623, 0.9789538738948126, 0), z_dir=(0, 0, -1)) * Cylinder(2.45, 12, mode=Mode.PRIVATE)
    add(chamfer1_piece_22, mode=Mode.SUBTRACT)
    with BuildSketch(Plane(origin=(0, 0, 8), x_dir=(-0.6453423073627307, 0.7638935176631274, 0), z_dir=(-0.7638935176631274, -0.6453423073627307, 0))) as chamfer1_piece_23_section:
        Polygon((2.95, -CHAMFER1_SIZE), (2.95 - CHAMFER1_SIZE, 0), (2.95, 0), align=None)
    chamfer1_piece_23 = revolve(axis=Axis((0, 0, 8), (0, 0, -1)), revolution_arc=125.382690704, mode=Mode.PRIVATE)
    chamfer1_piece_23 = split(chamfer1_piece_23, bisect_by=Plane(origin=(-0.353553391, 0.353553391, 8), z_dir=(-0.7071067811865565, 0.7071067811865386, 0)), keep=Keep.TOP, mode=Mode.PRIVATE)
    chamfer1_piece_23 = split(chamfer1_piece_23, bisect_by=Plane(origin=(0.5, 0, 8), z_dir=(1, 0, 0)), keep=Keep.TOP, mode=Mode.PRIVATE)
    chamfer1_piece_23 = chamfer1_piece_23 - Plane(origin=(0, 0, 8), x_dir=(-0.2040816326530623, 0.9789538738948126, 0), z_dir=(0, 0, -1)) * Cylinder(2.45, 12, mode=Mode.PRIVATE)
    add(chamfer1_piece_23, mode=Mode.SUBTRACT)
    with BuildSketch(Plane(origin=(0, 0, 8), x_dir=(-0.6453423073627307, 0.7638935176631274, 0), z_dir=(-0.7638935176631274, -0.6453423073627307, 0))) as chamfer1_piece_24_section:
        Polygon((2.95, -CHAMFER1_SIZE), (2.95 - CHAMFER1_SIZE, 0), (2.95, 0), align=None)
    chamfer1_piece_24 = revolve(axis=Axis((0, 0, 8), (0, 0, -1)), revolution_arc=125.382690704, mode=Mode.PRIVATE)
    chamfer1_piece_24 = split(chamfer1_piece_24, bisect_by=Plane(origin=(0, 0.5, 8), z_dir=(0, 1, 0)), keep=Keep.TOP, mode=Mode.PRIVATE)
    chamfer1_piece_24 = split(chamfer1_piece_24, bisect_by=Plane(origin=(0.353553391, -0.353553391, 8), z_dir=(0.707106781186556, -0.707106781186539, 0)), keep=Keep.TOP, mode=Mode.PRIVATE)
    chamfer1_piece_24 = chamfer1_piece_24 - Plane(origin=(0, 0, 8), x_dir=(-0.2040816326530623, 0.9789538738948126, 0), z_dir=(0, 0, -1)) * Cylinder(2.45, 12, mode=Mode.PRIVATE)
    add(chamfer1_piece_24, mode=Mode.SUBTRACT)


solid = part.part
